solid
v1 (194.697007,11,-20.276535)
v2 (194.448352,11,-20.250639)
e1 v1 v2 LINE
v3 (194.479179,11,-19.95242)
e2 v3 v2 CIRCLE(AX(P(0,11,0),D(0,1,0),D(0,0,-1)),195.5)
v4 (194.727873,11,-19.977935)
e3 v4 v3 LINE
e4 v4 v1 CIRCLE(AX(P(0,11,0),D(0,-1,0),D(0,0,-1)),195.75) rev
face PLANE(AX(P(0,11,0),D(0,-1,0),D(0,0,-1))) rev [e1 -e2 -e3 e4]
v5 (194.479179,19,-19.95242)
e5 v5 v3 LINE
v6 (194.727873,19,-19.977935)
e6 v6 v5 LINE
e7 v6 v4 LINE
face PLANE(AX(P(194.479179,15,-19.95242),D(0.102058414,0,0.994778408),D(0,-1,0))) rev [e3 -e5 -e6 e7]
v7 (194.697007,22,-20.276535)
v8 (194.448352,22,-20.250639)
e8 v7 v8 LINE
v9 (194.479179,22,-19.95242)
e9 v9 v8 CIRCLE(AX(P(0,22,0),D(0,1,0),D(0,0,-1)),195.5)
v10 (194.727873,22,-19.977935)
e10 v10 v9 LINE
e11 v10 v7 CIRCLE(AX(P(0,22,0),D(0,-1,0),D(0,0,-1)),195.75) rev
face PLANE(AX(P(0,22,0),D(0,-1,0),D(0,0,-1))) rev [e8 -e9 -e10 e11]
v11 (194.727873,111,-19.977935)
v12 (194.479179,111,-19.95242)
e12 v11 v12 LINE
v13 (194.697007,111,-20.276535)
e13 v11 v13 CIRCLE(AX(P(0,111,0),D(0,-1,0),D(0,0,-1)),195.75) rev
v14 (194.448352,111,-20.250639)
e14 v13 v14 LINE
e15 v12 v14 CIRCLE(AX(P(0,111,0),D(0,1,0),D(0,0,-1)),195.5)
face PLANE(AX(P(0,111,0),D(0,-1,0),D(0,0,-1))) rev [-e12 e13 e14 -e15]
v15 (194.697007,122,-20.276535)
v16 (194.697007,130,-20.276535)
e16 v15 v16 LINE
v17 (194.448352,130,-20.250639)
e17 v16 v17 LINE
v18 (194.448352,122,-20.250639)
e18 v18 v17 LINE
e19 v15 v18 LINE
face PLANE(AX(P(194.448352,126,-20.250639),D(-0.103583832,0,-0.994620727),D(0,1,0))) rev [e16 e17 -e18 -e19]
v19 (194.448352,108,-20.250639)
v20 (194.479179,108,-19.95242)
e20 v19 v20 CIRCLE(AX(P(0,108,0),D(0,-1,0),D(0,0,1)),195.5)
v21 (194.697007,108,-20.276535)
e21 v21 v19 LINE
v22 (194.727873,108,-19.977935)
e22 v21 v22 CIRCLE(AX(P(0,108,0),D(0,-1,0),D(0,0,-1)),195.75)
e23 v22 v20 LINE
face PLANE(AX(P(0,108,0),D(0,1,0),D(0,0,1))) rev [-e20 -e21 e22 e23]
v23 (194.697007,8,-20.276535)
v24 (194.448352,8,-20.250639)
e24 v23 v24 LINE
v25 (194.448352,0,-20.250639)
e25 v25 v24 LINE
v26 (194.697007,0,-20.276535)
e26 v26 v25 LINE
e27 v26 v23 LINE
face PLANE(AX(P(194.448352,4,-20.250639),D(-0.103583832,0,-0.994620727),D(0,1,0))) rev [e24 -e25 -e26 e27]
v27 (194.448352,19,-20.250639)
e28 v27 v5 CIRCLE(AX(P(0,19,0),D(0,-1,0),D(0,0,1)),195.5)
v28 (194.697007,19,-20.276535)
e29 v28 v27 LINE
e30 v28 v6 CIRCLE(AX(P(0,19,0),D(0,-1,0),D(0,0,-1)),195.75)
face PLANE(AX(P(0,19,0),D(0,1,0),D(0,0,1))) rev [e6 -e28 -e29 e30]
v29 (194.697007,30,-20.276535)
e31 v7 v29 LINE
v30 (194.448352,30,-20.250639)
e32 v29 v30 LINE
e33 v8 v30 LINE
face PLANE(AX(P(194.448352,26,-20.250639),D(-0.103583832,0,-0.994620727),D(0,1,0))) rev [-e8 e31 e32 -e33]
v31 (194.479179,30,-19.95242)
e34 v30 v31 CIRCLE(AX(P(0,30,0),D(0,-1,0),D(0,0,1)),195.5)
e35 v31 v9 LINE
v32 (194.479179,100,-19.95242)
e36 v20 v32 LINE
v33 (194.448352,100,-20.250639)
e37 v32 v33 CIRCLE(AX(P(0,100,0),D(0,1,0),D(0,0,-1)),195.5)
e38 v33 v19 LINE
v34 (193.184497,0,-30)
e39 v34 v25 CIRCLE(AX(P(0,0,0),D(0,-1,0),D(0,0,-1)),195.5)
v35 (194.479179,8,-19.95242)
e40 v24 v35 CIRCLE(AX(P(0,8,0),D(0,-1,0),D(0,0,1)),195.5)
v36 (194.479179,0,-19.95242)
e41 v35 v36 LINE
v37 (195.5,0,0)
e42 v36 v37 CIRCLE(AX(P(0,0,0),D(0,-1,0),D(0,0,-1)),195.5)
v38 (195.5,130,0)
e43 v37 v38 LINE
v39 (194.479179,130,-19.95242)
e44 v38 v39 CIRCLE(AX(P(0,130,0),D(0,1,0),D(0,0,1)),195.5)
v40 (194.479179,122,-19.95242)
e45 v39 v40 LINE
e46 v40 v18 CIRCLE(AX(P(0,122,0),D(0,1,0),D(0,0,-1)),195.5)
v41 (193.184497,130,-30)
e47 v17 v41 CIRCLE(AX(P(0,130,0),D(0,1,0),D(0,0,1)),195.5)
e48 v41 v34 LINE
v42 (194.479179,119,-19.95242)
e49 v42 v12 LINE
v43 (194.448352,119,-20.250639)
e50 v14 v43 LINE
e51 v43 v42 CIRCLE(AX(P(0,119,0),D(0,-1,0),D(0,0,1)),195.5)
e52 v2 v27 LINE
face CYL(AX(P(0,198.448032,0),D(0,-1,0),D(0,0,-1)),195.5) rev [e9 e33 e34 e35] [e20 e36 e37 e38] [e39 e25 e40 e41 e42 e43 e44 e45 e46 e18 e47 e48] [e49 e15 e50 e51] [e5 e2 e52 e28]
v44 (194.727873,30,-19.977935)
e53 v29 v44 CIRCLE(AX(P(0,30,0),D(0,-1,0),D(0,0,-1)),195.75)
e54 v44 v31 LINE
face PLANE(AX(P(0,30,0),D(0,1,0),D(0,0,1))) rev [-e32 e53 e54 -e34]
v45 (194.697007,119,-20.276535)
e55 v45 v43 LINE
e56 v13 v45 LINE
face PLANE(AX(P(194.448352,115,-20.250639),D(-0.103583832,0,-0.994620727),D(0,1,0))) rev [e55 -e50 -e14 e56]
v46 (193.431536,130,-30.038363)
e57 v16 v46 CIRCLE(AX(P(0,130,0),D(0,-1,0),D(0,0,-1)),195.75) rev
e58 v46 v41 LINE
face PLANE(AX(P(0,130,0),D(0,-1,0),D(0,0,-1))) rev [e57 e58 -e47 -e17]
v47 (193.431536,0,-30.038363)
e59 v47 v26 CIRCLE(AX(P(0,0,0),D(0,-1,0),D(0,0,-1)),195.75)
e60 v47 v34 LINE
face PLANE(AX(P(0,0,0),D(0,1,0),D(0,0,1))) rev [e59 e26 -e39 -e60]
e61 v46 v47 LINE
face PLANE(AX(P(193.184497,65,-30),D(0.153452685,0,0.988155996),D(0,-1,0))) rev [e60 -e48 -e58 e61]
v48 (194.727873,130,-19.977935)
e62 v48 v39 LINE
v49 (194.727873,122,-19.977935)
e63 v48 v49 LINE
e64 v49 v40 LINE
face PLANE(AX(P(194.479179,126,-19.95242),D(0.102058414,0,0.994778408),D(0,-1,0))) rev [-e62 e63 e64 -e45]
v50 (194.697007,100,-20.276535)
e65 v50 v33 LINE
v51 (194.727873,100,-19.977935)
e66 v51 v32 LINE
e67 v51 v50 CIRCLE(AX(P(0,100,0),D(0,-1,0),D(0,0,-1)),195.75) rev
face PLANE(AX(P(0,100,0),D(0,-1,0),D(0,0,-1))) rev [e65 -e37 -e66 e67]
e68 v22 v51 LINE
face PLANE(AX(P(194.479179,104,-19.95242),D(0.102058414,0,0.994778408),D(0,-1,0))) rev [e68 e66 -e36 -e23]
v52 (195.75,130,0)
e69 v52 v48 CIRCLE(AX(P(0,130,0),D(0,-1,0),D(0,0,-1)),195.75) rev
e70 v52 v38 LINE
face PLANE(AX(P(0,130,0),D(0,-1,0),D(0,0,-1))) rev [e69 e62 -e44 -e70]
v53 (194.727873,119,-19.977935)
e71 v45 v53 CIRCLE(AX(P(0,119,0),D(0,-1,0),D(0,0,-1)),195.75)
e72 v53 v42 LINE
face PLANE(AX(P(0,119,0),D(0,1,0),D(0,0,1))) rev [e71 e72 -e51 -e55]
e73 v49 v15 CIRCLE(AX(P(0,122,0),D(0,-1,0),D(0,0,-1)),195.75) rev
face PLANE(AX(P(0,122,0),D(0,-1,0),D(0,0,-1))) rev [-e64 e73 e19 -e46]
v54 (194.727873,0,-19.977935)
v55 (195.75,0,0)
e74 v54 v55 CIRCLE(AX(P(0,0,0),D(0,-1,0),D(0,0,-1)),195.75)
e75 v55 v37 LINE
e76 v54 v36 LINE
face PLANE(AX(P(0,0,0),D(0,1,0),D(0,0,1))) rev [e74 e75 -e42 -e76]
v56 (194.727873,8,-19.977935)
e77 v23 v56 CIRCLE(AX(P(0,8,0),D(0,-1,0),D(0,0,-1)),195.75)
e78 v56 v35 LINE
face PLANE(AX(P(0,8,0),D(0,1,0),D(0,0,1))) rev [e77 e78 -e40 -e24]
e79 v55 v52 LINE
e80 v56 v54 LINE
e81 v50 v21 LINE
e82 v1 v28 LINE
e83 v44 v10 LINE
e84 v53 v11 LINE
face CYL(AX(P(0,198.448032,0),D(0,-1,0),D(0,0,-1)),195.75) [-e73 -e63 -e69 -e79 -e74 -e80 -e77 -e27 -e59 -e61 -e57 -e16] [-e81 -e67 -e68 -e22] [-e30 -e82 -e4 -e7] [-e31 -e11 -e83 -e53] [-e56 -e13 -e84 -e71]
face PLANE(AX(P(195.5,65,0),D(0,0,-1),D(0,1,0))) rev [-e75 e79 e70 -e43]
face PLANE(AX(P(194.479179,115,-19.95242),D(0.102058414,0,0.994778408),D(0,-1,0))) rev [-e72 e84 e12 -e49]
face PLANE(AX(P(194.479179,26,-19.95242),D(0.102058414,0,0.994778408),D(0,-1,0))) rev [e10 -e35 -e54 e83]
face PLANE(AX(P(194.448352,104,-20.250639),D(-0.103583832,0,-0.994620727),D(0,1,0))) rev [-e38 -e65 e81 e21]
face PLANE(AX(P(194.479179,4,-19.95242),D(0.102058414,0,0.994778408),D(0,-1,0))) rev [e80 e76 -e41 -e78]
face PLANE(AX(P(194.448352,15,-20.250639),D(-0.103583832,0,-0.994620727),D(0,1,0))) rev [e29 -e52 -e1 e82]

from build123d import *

# Parameters (mm, degrees)
BASE_FLANGE1_DEPTH        = 130
UNFOLD1_DEPTH             = 130
UNFOLD1_2_DEPTH           = 130
SKETCH6_W                 = 0.3
SKETCH6_H                 = 8
CUT_EXTRUDE1_DEPTH        = 235.985371885
LPATTERN1_COUNT           = 3
LPATTERN1_PITCH           = 11
LPATTERN2_COUNT           = 3
LPATTERN2_PITCH           = 100
LPATTERN2_COPY_1_SKETCH_W = 0.3
LPATTERN2_COPY_1_SKETCH_H = 8
LPATTERN2_COPY_1_DEPTH    = 235.985371885
LPATTERN2_COPY_2_SKETCH_W = 0.3
LPATTERN2_COPY_2_SKETCH_H = 8
LPATTERN2_COPY_2_DEPTH    = 235.985371885
LPATTERN2_COPY_3_SKETCH_W = 0.3
LPATTERN2_COPY_3_SKETCH_H = 8
LPATTERN2_COPY_3_DEPTH    = 235.985371885
LPATTERN2_COPY_4_SKETCH_W = 0.3
LPATTERN2_COPY_4_SKETCH_H = 8
LPATTERN2_COPY_4_DEPTH    = 235.985371885
FOLD1_DEPTH               = 130
FOLD1_2_DEPTH             = 130
FOLD1_START               = 30
FOLD1_3_DEPTH             = 70
FOLD1_START_2             = 8
FOLD1_4_DEPTH             = 3
FOLD1_START_3             = 19
FOLD1_5_DEPTH             = 3
FOLD1_START_4             = 108
FOLD1_6_DEPTH             = 3
FOLD1_START_5             = 119
FOLD1_7_DEPTH             = 3


# Read off the part's stored shape, not the designer's step: Unfold1, Fold1
# Sheet-metal steps are written as plain solids
with BuildPart() as part:
    # Sketch1 → Base-Flange1 (new body)
    with BuildSketch(Plane(origin=(0, 0, 0), x_dir=(1, 0, 0), z_dir=(0, 1, 0))):
        with BuildLine():
            ThreePointArc((195.5, 0), (194.920264754, 15.044613261), (193.184497308, 30))
            Line((193.184497308, 30), (193.431536307, 30.038363171))
            ThreePointArc((193.431536307, 30.038363171), (195.169523405, 15.063851897), (195.75, 0))
            Line((195.75, 0), (195.5, 0))
        make_face()
    extrude(amount=BASE_FLANGE1_DEPTH)

    # Unfold1 outline → Unfold1 (cut)
    with BuildSketch(Plane(origin=(0, 0, 0), x_dir=(1, 0, 0), z_dir=(0, 1, 0))):
        with BuildLine():
            Line((195.5, 0), (195.5, 9.890020227))
            ThreePointArc((195.5, 9.890020227), (194.726536236, 19.990962601), (193.431536307, 30.038363171))
            Line((193.431536307, 30.038363171), (193.184497308, 30))
            ThreePointArc((193.184497308, 30), (194.920264754, 15.044613261), (195.5, 0))
        make_face()
    extrude(amount=UNFOLD1_DEPTH, mode=Mode.SUBTRACT)

    # Unfold1 2 outline → Unfold1 2 (add)
    with BuildSketch(Plane(origin=(0, 0, 0), x_dir=(1, 0, 0), z_dir=(0, 1, 0))):
        with BuildLine():
            Line((195.75, 0), (195.75, 30.138261696))
            Line((195.75, 30.138261696), (195.5, 30.138261696))
            Line((195.5, 30.138261696), (195.5, 9.890020227))
            ThreePointArc((195.5, 9.890020227), (195.687490019, 4.946589737), (195.75, 0))
        make_face()
    extrude(amount=UNFOLD1_2_DEPTH)

    # Sketch6 → Cut-Extrude1 (cut, symmetric)
    with BuildSketch(Plane(origin=(195.75, 0, -195.75), x_dir=(0, 0, 1), z_dir=(-1, 0, 0))):
        with Locations((175.6, 126)):
            Rectangle(SKETCH6_W, SKETCH6_H)
    cut_extrude1 = extrude(amount=CUT_EXTRUDE1_DEPTH, both=True, mode=Mode.SUBTRACT)

    # LPattern1: Cut-Extrude1 ×3
    with Locations(*[(0, -i * LPATTERN1_PITCH, 0) for i in range(1, LPATTERN1_COUNT)]):
        add(cut_extrude1, mode=Mode.SUBTRACT)

    # LPattern2: Cut-Extrude1 ×3
    with Locations(*[(0, -i * LPATTERN2_PITCH, 0) for i in range(1, LPATTERN2_COUNT)]):
        add(cut_extrude1, mode=Mode.SUBTRACT)

    # LPattern2 copy 1 sketch → LPattern2 copy 1 (cut, symmetric)
    with BuildSketch(Plane(origin=(195.75, -111, -195.75), x_dir=(0, 0, 1), z_dir=(-1, 0, 0))):
        with Locations((175.6, 126)):
            Rectangle(LPATTERN2_COPY_1_SKETCH_W, LPATTERN2_COPY_1_SKETCH_H)
    extrude(amount=LPATTERN2_COPY_1_DEPTH, both=True, mode=Mode.SUBTRACT)

    # LPattern2 copy 2 sketch → LPattern2 copy 2 (cut, symmetric)
    with BuildSketch(Plane(origin=(195.75, -211, -195.75), x_dir=(0, 0, 1), z_dir=(-1, 0, 0))):
        with Locations((175.6, 126)):
            Rectangle(LPATTERN2_COPY_2_SKETCH_W, LPATTERN2_COPY_2_SKETCH_H)
    extrude(amount=LPATTERN2_COPY_2_DEPTH, both=True, mode=Mode.SUBTRACT)

    # LPattern2 copy 3 sketch → LPattern2 copy 3 (cut, symmetric)
    with BuildSketch(Plane(origin=(195.75, -122, -195.75), x_dir=(0, 0, 1), z_dir=(-1, 0, 0))):
        with Locations((175.6, 126)):
            Rectangle(LPATTERN2_COPY_3_SKETCH_W, LPATTERN2_COPY_3_SKETCH_H)
    extrude(amount=LPATTERN2_COPY_3_DEPTH, both=True, mode=Mode.SUBTRACT)

    # LPattern2 copy 4 sketch → LPattern2 copy 4 (cut, symmetric)
    with BuildSketch(Plane(origin=(195.75, -222, -195.75), x_dir=(0, 0, 1), z_dir=(-1, 0, 0))):
        with Locations((175.6, 126)):
            Rectangle(LPATTERN2_COPY_4_SKETCH_W, LPATTERN2_COPY_4_SKETCH_H)
    extrude(amount=LPATTERN2_COPY_4_DEPTH, both=True, mode=Mode.SUBTRACT)

    # Fold1 outline → Fold1 (cut)
    with BuildSketch(Plane(origin=(0, 0, 0), x_dir=(1, 0, 0), z_dir=(0, 1, 0))):
        with BuildLine():
            ThreePointArc((195.5, 9.890020227), (195.687490019, 4.946589737), (195.75, 0))
            Line((195.75, 0), (195.75, 30.138261696))
            Line((195.75, 30.138261696), (195.5, 30.138261696))
            Line((195.5, 30.138261696), (195.5, 9.890020227))
        make_face()
    extrude(amount=FOLD1_DEPTH, mode=Mode.SUBTRACT)

    # Fold1 2 outline → Fold1 2 (add)
    with BuildSketch(Plane(origin=(0, 0, 0), x_dir=(1, 0, 0), z_dir=(0, 1, 0))):
        with BuildLine():
            Line((194.448352042, 20.2506392), (194.697007224, 20.276535158))
            ThreePointArc((194.697007224, 20.276535158), (194.12564204, 25.165404877), (193.431536307, 30.038363171))
            Line((193.431536307, 30.038363171), (193.184497308, 30))
            ThreePointArc((193.184497308, 30), (193.877716571, 25.133265152), (194.448352042, 20.2506392))
        make_face()
        with BuildLine():
            ThreePointArc((195.5, 9.890020227), (195.179122281, 14.938966685), (194.727873277, 19.977934553))
            Line((194.727873277, 19.977934553), (194.479178675, 19.952419949))
            ThreePointArc((194.479178675, 19.952419949), (195.244627879, 9.989258456), (195.5, 0))
            Line((195.5, 0), (195.5, 9.890020227))
        make_face()
    extrude(amount=FOLD1_2_DEPTH)

    # Fold1 3 outline → Fold1 3 (add)
    with BuildSketch(Plane(origin=(0, 0, 0), x_dir=(1, 0, 0), z_dir=(0, 1, 0)).offset(FOLD1_START)):
        with BuildLine():
            ThreePointArc((194.727873277, 19.977934553), (194.712497491, 20.127240772), (194.697007224, 20.276535158))
            Line((194.697007224, 20.276535158), (194.448352042, 20.2506392))
            ThreePointArc((194.448352042, 20.2506392), (194.463822525, 20.101535484), (194.479178675, 19.952419949))
            Line((194.479178675, 19.952419949), (194.727873277, 19.977934553))
        make_face()
    extrude(amount=FOLD1_3_DEPTH)

    # Fold1 4 outline → Fold1 4 (add)
    with BuildSketch(Plane(origin=(0, 0, 0), x_dir=(1, 0, 0), z_dir=(0, 1, 0)).offset(FOLD1_START_2)):
        with BuildLine():
            ThreePointArc((194.727873277, 19.977934553), (194.712497491, 20.127240772), (194.697007224, 20.276535158))
            Line((194.697007224, 20.276535158), (194.448352042, 20.2506392))
            ThreePointArc((194.448352042, 20.2506392), (194.463822525, 20.101535484), (194.479178675, 19.952419949))
            Line((194.479178675, 19.952419949), (194.727873277, 19.977934553))
        make_face()
    extrude(amount=FOLD1_4_DEPTH)

    # Fold1 5 outline → Fold1 5 (add)
    with BuildSketch(Plane(origin=(0, 0, 0), x_dir=(1, 0, 0), z_dir=(0, 1, 0)).offset(FOLD1_START_3)):
        with BuildLine():
            ThreePointArc((194.727873277, 19.977934553), (194.712497491, 20.127240772), (194.697007224, 20.276535158))
            Line((194.697007224, 20.276535158), (194.448352042, 20.2506392))
            ThreePointArc((194.448352042, 20.2506392), (194.463822525, 20.101535484), (194.479178675, 19.952419949))
            Line((194.479178675, 19.952419949), (194.727873277, 19.977934553))
        make_face()
    extrude(amount=FOLD1_5_DEPTH)

    # Fold1 6 outline → Fold1 6 (add)
    with BuildSketch(Plane(origin=(0, 0, 0), x_dir=(1, 0, 0), z_dir=(0, 1, 0)).offset(FOLD1_START_4)):
        with BuildLine():
            ThreePointArc((194.727873277, 19.977934553), (194.712497491, 20.127240772), (194.697007224, 20.276535158))
            Line((194.697007224, 20.276535158), (194.448352042, 20.2506392))
            ThreePointArc((194.448352042, 20.2506392), (194.463822525, 20.101535484), (194.479178675, 19.952419949))
            Line((194.479178675, 19.952419949), (194.727873277, 19.977934553))
        make_face()
    extrude(amount=FOLD1_6_DEPTH)

    # Fold1 7 outline → Fold1 7 (add)
    with BuildSketch(Plane(origin=(0, 0, 0), x_dir=(1, 0, 0), z_dir=(0, 1, 0)).offset(FOLD1_START_5)):
        with BuildLine():
            ThreePointArc((194.727873277, 19.977934553), (194.712497491, 20.127240772), (194.697007224, 20.276535158))
            Line((194.697007224, 20.276535158), (194.448352042, 20.2506392))
            ThreePointArc((194.448352042, 20.2506392), (194.463822525, 20.101535484), (194.479178675, 19.952419949))
            Line((194.479178675, 19.952419949), (194.727873277, 19.977934553))
        make_face()
    extrude(amount=FOLD1_7_DEPTH)


solid = part.part
